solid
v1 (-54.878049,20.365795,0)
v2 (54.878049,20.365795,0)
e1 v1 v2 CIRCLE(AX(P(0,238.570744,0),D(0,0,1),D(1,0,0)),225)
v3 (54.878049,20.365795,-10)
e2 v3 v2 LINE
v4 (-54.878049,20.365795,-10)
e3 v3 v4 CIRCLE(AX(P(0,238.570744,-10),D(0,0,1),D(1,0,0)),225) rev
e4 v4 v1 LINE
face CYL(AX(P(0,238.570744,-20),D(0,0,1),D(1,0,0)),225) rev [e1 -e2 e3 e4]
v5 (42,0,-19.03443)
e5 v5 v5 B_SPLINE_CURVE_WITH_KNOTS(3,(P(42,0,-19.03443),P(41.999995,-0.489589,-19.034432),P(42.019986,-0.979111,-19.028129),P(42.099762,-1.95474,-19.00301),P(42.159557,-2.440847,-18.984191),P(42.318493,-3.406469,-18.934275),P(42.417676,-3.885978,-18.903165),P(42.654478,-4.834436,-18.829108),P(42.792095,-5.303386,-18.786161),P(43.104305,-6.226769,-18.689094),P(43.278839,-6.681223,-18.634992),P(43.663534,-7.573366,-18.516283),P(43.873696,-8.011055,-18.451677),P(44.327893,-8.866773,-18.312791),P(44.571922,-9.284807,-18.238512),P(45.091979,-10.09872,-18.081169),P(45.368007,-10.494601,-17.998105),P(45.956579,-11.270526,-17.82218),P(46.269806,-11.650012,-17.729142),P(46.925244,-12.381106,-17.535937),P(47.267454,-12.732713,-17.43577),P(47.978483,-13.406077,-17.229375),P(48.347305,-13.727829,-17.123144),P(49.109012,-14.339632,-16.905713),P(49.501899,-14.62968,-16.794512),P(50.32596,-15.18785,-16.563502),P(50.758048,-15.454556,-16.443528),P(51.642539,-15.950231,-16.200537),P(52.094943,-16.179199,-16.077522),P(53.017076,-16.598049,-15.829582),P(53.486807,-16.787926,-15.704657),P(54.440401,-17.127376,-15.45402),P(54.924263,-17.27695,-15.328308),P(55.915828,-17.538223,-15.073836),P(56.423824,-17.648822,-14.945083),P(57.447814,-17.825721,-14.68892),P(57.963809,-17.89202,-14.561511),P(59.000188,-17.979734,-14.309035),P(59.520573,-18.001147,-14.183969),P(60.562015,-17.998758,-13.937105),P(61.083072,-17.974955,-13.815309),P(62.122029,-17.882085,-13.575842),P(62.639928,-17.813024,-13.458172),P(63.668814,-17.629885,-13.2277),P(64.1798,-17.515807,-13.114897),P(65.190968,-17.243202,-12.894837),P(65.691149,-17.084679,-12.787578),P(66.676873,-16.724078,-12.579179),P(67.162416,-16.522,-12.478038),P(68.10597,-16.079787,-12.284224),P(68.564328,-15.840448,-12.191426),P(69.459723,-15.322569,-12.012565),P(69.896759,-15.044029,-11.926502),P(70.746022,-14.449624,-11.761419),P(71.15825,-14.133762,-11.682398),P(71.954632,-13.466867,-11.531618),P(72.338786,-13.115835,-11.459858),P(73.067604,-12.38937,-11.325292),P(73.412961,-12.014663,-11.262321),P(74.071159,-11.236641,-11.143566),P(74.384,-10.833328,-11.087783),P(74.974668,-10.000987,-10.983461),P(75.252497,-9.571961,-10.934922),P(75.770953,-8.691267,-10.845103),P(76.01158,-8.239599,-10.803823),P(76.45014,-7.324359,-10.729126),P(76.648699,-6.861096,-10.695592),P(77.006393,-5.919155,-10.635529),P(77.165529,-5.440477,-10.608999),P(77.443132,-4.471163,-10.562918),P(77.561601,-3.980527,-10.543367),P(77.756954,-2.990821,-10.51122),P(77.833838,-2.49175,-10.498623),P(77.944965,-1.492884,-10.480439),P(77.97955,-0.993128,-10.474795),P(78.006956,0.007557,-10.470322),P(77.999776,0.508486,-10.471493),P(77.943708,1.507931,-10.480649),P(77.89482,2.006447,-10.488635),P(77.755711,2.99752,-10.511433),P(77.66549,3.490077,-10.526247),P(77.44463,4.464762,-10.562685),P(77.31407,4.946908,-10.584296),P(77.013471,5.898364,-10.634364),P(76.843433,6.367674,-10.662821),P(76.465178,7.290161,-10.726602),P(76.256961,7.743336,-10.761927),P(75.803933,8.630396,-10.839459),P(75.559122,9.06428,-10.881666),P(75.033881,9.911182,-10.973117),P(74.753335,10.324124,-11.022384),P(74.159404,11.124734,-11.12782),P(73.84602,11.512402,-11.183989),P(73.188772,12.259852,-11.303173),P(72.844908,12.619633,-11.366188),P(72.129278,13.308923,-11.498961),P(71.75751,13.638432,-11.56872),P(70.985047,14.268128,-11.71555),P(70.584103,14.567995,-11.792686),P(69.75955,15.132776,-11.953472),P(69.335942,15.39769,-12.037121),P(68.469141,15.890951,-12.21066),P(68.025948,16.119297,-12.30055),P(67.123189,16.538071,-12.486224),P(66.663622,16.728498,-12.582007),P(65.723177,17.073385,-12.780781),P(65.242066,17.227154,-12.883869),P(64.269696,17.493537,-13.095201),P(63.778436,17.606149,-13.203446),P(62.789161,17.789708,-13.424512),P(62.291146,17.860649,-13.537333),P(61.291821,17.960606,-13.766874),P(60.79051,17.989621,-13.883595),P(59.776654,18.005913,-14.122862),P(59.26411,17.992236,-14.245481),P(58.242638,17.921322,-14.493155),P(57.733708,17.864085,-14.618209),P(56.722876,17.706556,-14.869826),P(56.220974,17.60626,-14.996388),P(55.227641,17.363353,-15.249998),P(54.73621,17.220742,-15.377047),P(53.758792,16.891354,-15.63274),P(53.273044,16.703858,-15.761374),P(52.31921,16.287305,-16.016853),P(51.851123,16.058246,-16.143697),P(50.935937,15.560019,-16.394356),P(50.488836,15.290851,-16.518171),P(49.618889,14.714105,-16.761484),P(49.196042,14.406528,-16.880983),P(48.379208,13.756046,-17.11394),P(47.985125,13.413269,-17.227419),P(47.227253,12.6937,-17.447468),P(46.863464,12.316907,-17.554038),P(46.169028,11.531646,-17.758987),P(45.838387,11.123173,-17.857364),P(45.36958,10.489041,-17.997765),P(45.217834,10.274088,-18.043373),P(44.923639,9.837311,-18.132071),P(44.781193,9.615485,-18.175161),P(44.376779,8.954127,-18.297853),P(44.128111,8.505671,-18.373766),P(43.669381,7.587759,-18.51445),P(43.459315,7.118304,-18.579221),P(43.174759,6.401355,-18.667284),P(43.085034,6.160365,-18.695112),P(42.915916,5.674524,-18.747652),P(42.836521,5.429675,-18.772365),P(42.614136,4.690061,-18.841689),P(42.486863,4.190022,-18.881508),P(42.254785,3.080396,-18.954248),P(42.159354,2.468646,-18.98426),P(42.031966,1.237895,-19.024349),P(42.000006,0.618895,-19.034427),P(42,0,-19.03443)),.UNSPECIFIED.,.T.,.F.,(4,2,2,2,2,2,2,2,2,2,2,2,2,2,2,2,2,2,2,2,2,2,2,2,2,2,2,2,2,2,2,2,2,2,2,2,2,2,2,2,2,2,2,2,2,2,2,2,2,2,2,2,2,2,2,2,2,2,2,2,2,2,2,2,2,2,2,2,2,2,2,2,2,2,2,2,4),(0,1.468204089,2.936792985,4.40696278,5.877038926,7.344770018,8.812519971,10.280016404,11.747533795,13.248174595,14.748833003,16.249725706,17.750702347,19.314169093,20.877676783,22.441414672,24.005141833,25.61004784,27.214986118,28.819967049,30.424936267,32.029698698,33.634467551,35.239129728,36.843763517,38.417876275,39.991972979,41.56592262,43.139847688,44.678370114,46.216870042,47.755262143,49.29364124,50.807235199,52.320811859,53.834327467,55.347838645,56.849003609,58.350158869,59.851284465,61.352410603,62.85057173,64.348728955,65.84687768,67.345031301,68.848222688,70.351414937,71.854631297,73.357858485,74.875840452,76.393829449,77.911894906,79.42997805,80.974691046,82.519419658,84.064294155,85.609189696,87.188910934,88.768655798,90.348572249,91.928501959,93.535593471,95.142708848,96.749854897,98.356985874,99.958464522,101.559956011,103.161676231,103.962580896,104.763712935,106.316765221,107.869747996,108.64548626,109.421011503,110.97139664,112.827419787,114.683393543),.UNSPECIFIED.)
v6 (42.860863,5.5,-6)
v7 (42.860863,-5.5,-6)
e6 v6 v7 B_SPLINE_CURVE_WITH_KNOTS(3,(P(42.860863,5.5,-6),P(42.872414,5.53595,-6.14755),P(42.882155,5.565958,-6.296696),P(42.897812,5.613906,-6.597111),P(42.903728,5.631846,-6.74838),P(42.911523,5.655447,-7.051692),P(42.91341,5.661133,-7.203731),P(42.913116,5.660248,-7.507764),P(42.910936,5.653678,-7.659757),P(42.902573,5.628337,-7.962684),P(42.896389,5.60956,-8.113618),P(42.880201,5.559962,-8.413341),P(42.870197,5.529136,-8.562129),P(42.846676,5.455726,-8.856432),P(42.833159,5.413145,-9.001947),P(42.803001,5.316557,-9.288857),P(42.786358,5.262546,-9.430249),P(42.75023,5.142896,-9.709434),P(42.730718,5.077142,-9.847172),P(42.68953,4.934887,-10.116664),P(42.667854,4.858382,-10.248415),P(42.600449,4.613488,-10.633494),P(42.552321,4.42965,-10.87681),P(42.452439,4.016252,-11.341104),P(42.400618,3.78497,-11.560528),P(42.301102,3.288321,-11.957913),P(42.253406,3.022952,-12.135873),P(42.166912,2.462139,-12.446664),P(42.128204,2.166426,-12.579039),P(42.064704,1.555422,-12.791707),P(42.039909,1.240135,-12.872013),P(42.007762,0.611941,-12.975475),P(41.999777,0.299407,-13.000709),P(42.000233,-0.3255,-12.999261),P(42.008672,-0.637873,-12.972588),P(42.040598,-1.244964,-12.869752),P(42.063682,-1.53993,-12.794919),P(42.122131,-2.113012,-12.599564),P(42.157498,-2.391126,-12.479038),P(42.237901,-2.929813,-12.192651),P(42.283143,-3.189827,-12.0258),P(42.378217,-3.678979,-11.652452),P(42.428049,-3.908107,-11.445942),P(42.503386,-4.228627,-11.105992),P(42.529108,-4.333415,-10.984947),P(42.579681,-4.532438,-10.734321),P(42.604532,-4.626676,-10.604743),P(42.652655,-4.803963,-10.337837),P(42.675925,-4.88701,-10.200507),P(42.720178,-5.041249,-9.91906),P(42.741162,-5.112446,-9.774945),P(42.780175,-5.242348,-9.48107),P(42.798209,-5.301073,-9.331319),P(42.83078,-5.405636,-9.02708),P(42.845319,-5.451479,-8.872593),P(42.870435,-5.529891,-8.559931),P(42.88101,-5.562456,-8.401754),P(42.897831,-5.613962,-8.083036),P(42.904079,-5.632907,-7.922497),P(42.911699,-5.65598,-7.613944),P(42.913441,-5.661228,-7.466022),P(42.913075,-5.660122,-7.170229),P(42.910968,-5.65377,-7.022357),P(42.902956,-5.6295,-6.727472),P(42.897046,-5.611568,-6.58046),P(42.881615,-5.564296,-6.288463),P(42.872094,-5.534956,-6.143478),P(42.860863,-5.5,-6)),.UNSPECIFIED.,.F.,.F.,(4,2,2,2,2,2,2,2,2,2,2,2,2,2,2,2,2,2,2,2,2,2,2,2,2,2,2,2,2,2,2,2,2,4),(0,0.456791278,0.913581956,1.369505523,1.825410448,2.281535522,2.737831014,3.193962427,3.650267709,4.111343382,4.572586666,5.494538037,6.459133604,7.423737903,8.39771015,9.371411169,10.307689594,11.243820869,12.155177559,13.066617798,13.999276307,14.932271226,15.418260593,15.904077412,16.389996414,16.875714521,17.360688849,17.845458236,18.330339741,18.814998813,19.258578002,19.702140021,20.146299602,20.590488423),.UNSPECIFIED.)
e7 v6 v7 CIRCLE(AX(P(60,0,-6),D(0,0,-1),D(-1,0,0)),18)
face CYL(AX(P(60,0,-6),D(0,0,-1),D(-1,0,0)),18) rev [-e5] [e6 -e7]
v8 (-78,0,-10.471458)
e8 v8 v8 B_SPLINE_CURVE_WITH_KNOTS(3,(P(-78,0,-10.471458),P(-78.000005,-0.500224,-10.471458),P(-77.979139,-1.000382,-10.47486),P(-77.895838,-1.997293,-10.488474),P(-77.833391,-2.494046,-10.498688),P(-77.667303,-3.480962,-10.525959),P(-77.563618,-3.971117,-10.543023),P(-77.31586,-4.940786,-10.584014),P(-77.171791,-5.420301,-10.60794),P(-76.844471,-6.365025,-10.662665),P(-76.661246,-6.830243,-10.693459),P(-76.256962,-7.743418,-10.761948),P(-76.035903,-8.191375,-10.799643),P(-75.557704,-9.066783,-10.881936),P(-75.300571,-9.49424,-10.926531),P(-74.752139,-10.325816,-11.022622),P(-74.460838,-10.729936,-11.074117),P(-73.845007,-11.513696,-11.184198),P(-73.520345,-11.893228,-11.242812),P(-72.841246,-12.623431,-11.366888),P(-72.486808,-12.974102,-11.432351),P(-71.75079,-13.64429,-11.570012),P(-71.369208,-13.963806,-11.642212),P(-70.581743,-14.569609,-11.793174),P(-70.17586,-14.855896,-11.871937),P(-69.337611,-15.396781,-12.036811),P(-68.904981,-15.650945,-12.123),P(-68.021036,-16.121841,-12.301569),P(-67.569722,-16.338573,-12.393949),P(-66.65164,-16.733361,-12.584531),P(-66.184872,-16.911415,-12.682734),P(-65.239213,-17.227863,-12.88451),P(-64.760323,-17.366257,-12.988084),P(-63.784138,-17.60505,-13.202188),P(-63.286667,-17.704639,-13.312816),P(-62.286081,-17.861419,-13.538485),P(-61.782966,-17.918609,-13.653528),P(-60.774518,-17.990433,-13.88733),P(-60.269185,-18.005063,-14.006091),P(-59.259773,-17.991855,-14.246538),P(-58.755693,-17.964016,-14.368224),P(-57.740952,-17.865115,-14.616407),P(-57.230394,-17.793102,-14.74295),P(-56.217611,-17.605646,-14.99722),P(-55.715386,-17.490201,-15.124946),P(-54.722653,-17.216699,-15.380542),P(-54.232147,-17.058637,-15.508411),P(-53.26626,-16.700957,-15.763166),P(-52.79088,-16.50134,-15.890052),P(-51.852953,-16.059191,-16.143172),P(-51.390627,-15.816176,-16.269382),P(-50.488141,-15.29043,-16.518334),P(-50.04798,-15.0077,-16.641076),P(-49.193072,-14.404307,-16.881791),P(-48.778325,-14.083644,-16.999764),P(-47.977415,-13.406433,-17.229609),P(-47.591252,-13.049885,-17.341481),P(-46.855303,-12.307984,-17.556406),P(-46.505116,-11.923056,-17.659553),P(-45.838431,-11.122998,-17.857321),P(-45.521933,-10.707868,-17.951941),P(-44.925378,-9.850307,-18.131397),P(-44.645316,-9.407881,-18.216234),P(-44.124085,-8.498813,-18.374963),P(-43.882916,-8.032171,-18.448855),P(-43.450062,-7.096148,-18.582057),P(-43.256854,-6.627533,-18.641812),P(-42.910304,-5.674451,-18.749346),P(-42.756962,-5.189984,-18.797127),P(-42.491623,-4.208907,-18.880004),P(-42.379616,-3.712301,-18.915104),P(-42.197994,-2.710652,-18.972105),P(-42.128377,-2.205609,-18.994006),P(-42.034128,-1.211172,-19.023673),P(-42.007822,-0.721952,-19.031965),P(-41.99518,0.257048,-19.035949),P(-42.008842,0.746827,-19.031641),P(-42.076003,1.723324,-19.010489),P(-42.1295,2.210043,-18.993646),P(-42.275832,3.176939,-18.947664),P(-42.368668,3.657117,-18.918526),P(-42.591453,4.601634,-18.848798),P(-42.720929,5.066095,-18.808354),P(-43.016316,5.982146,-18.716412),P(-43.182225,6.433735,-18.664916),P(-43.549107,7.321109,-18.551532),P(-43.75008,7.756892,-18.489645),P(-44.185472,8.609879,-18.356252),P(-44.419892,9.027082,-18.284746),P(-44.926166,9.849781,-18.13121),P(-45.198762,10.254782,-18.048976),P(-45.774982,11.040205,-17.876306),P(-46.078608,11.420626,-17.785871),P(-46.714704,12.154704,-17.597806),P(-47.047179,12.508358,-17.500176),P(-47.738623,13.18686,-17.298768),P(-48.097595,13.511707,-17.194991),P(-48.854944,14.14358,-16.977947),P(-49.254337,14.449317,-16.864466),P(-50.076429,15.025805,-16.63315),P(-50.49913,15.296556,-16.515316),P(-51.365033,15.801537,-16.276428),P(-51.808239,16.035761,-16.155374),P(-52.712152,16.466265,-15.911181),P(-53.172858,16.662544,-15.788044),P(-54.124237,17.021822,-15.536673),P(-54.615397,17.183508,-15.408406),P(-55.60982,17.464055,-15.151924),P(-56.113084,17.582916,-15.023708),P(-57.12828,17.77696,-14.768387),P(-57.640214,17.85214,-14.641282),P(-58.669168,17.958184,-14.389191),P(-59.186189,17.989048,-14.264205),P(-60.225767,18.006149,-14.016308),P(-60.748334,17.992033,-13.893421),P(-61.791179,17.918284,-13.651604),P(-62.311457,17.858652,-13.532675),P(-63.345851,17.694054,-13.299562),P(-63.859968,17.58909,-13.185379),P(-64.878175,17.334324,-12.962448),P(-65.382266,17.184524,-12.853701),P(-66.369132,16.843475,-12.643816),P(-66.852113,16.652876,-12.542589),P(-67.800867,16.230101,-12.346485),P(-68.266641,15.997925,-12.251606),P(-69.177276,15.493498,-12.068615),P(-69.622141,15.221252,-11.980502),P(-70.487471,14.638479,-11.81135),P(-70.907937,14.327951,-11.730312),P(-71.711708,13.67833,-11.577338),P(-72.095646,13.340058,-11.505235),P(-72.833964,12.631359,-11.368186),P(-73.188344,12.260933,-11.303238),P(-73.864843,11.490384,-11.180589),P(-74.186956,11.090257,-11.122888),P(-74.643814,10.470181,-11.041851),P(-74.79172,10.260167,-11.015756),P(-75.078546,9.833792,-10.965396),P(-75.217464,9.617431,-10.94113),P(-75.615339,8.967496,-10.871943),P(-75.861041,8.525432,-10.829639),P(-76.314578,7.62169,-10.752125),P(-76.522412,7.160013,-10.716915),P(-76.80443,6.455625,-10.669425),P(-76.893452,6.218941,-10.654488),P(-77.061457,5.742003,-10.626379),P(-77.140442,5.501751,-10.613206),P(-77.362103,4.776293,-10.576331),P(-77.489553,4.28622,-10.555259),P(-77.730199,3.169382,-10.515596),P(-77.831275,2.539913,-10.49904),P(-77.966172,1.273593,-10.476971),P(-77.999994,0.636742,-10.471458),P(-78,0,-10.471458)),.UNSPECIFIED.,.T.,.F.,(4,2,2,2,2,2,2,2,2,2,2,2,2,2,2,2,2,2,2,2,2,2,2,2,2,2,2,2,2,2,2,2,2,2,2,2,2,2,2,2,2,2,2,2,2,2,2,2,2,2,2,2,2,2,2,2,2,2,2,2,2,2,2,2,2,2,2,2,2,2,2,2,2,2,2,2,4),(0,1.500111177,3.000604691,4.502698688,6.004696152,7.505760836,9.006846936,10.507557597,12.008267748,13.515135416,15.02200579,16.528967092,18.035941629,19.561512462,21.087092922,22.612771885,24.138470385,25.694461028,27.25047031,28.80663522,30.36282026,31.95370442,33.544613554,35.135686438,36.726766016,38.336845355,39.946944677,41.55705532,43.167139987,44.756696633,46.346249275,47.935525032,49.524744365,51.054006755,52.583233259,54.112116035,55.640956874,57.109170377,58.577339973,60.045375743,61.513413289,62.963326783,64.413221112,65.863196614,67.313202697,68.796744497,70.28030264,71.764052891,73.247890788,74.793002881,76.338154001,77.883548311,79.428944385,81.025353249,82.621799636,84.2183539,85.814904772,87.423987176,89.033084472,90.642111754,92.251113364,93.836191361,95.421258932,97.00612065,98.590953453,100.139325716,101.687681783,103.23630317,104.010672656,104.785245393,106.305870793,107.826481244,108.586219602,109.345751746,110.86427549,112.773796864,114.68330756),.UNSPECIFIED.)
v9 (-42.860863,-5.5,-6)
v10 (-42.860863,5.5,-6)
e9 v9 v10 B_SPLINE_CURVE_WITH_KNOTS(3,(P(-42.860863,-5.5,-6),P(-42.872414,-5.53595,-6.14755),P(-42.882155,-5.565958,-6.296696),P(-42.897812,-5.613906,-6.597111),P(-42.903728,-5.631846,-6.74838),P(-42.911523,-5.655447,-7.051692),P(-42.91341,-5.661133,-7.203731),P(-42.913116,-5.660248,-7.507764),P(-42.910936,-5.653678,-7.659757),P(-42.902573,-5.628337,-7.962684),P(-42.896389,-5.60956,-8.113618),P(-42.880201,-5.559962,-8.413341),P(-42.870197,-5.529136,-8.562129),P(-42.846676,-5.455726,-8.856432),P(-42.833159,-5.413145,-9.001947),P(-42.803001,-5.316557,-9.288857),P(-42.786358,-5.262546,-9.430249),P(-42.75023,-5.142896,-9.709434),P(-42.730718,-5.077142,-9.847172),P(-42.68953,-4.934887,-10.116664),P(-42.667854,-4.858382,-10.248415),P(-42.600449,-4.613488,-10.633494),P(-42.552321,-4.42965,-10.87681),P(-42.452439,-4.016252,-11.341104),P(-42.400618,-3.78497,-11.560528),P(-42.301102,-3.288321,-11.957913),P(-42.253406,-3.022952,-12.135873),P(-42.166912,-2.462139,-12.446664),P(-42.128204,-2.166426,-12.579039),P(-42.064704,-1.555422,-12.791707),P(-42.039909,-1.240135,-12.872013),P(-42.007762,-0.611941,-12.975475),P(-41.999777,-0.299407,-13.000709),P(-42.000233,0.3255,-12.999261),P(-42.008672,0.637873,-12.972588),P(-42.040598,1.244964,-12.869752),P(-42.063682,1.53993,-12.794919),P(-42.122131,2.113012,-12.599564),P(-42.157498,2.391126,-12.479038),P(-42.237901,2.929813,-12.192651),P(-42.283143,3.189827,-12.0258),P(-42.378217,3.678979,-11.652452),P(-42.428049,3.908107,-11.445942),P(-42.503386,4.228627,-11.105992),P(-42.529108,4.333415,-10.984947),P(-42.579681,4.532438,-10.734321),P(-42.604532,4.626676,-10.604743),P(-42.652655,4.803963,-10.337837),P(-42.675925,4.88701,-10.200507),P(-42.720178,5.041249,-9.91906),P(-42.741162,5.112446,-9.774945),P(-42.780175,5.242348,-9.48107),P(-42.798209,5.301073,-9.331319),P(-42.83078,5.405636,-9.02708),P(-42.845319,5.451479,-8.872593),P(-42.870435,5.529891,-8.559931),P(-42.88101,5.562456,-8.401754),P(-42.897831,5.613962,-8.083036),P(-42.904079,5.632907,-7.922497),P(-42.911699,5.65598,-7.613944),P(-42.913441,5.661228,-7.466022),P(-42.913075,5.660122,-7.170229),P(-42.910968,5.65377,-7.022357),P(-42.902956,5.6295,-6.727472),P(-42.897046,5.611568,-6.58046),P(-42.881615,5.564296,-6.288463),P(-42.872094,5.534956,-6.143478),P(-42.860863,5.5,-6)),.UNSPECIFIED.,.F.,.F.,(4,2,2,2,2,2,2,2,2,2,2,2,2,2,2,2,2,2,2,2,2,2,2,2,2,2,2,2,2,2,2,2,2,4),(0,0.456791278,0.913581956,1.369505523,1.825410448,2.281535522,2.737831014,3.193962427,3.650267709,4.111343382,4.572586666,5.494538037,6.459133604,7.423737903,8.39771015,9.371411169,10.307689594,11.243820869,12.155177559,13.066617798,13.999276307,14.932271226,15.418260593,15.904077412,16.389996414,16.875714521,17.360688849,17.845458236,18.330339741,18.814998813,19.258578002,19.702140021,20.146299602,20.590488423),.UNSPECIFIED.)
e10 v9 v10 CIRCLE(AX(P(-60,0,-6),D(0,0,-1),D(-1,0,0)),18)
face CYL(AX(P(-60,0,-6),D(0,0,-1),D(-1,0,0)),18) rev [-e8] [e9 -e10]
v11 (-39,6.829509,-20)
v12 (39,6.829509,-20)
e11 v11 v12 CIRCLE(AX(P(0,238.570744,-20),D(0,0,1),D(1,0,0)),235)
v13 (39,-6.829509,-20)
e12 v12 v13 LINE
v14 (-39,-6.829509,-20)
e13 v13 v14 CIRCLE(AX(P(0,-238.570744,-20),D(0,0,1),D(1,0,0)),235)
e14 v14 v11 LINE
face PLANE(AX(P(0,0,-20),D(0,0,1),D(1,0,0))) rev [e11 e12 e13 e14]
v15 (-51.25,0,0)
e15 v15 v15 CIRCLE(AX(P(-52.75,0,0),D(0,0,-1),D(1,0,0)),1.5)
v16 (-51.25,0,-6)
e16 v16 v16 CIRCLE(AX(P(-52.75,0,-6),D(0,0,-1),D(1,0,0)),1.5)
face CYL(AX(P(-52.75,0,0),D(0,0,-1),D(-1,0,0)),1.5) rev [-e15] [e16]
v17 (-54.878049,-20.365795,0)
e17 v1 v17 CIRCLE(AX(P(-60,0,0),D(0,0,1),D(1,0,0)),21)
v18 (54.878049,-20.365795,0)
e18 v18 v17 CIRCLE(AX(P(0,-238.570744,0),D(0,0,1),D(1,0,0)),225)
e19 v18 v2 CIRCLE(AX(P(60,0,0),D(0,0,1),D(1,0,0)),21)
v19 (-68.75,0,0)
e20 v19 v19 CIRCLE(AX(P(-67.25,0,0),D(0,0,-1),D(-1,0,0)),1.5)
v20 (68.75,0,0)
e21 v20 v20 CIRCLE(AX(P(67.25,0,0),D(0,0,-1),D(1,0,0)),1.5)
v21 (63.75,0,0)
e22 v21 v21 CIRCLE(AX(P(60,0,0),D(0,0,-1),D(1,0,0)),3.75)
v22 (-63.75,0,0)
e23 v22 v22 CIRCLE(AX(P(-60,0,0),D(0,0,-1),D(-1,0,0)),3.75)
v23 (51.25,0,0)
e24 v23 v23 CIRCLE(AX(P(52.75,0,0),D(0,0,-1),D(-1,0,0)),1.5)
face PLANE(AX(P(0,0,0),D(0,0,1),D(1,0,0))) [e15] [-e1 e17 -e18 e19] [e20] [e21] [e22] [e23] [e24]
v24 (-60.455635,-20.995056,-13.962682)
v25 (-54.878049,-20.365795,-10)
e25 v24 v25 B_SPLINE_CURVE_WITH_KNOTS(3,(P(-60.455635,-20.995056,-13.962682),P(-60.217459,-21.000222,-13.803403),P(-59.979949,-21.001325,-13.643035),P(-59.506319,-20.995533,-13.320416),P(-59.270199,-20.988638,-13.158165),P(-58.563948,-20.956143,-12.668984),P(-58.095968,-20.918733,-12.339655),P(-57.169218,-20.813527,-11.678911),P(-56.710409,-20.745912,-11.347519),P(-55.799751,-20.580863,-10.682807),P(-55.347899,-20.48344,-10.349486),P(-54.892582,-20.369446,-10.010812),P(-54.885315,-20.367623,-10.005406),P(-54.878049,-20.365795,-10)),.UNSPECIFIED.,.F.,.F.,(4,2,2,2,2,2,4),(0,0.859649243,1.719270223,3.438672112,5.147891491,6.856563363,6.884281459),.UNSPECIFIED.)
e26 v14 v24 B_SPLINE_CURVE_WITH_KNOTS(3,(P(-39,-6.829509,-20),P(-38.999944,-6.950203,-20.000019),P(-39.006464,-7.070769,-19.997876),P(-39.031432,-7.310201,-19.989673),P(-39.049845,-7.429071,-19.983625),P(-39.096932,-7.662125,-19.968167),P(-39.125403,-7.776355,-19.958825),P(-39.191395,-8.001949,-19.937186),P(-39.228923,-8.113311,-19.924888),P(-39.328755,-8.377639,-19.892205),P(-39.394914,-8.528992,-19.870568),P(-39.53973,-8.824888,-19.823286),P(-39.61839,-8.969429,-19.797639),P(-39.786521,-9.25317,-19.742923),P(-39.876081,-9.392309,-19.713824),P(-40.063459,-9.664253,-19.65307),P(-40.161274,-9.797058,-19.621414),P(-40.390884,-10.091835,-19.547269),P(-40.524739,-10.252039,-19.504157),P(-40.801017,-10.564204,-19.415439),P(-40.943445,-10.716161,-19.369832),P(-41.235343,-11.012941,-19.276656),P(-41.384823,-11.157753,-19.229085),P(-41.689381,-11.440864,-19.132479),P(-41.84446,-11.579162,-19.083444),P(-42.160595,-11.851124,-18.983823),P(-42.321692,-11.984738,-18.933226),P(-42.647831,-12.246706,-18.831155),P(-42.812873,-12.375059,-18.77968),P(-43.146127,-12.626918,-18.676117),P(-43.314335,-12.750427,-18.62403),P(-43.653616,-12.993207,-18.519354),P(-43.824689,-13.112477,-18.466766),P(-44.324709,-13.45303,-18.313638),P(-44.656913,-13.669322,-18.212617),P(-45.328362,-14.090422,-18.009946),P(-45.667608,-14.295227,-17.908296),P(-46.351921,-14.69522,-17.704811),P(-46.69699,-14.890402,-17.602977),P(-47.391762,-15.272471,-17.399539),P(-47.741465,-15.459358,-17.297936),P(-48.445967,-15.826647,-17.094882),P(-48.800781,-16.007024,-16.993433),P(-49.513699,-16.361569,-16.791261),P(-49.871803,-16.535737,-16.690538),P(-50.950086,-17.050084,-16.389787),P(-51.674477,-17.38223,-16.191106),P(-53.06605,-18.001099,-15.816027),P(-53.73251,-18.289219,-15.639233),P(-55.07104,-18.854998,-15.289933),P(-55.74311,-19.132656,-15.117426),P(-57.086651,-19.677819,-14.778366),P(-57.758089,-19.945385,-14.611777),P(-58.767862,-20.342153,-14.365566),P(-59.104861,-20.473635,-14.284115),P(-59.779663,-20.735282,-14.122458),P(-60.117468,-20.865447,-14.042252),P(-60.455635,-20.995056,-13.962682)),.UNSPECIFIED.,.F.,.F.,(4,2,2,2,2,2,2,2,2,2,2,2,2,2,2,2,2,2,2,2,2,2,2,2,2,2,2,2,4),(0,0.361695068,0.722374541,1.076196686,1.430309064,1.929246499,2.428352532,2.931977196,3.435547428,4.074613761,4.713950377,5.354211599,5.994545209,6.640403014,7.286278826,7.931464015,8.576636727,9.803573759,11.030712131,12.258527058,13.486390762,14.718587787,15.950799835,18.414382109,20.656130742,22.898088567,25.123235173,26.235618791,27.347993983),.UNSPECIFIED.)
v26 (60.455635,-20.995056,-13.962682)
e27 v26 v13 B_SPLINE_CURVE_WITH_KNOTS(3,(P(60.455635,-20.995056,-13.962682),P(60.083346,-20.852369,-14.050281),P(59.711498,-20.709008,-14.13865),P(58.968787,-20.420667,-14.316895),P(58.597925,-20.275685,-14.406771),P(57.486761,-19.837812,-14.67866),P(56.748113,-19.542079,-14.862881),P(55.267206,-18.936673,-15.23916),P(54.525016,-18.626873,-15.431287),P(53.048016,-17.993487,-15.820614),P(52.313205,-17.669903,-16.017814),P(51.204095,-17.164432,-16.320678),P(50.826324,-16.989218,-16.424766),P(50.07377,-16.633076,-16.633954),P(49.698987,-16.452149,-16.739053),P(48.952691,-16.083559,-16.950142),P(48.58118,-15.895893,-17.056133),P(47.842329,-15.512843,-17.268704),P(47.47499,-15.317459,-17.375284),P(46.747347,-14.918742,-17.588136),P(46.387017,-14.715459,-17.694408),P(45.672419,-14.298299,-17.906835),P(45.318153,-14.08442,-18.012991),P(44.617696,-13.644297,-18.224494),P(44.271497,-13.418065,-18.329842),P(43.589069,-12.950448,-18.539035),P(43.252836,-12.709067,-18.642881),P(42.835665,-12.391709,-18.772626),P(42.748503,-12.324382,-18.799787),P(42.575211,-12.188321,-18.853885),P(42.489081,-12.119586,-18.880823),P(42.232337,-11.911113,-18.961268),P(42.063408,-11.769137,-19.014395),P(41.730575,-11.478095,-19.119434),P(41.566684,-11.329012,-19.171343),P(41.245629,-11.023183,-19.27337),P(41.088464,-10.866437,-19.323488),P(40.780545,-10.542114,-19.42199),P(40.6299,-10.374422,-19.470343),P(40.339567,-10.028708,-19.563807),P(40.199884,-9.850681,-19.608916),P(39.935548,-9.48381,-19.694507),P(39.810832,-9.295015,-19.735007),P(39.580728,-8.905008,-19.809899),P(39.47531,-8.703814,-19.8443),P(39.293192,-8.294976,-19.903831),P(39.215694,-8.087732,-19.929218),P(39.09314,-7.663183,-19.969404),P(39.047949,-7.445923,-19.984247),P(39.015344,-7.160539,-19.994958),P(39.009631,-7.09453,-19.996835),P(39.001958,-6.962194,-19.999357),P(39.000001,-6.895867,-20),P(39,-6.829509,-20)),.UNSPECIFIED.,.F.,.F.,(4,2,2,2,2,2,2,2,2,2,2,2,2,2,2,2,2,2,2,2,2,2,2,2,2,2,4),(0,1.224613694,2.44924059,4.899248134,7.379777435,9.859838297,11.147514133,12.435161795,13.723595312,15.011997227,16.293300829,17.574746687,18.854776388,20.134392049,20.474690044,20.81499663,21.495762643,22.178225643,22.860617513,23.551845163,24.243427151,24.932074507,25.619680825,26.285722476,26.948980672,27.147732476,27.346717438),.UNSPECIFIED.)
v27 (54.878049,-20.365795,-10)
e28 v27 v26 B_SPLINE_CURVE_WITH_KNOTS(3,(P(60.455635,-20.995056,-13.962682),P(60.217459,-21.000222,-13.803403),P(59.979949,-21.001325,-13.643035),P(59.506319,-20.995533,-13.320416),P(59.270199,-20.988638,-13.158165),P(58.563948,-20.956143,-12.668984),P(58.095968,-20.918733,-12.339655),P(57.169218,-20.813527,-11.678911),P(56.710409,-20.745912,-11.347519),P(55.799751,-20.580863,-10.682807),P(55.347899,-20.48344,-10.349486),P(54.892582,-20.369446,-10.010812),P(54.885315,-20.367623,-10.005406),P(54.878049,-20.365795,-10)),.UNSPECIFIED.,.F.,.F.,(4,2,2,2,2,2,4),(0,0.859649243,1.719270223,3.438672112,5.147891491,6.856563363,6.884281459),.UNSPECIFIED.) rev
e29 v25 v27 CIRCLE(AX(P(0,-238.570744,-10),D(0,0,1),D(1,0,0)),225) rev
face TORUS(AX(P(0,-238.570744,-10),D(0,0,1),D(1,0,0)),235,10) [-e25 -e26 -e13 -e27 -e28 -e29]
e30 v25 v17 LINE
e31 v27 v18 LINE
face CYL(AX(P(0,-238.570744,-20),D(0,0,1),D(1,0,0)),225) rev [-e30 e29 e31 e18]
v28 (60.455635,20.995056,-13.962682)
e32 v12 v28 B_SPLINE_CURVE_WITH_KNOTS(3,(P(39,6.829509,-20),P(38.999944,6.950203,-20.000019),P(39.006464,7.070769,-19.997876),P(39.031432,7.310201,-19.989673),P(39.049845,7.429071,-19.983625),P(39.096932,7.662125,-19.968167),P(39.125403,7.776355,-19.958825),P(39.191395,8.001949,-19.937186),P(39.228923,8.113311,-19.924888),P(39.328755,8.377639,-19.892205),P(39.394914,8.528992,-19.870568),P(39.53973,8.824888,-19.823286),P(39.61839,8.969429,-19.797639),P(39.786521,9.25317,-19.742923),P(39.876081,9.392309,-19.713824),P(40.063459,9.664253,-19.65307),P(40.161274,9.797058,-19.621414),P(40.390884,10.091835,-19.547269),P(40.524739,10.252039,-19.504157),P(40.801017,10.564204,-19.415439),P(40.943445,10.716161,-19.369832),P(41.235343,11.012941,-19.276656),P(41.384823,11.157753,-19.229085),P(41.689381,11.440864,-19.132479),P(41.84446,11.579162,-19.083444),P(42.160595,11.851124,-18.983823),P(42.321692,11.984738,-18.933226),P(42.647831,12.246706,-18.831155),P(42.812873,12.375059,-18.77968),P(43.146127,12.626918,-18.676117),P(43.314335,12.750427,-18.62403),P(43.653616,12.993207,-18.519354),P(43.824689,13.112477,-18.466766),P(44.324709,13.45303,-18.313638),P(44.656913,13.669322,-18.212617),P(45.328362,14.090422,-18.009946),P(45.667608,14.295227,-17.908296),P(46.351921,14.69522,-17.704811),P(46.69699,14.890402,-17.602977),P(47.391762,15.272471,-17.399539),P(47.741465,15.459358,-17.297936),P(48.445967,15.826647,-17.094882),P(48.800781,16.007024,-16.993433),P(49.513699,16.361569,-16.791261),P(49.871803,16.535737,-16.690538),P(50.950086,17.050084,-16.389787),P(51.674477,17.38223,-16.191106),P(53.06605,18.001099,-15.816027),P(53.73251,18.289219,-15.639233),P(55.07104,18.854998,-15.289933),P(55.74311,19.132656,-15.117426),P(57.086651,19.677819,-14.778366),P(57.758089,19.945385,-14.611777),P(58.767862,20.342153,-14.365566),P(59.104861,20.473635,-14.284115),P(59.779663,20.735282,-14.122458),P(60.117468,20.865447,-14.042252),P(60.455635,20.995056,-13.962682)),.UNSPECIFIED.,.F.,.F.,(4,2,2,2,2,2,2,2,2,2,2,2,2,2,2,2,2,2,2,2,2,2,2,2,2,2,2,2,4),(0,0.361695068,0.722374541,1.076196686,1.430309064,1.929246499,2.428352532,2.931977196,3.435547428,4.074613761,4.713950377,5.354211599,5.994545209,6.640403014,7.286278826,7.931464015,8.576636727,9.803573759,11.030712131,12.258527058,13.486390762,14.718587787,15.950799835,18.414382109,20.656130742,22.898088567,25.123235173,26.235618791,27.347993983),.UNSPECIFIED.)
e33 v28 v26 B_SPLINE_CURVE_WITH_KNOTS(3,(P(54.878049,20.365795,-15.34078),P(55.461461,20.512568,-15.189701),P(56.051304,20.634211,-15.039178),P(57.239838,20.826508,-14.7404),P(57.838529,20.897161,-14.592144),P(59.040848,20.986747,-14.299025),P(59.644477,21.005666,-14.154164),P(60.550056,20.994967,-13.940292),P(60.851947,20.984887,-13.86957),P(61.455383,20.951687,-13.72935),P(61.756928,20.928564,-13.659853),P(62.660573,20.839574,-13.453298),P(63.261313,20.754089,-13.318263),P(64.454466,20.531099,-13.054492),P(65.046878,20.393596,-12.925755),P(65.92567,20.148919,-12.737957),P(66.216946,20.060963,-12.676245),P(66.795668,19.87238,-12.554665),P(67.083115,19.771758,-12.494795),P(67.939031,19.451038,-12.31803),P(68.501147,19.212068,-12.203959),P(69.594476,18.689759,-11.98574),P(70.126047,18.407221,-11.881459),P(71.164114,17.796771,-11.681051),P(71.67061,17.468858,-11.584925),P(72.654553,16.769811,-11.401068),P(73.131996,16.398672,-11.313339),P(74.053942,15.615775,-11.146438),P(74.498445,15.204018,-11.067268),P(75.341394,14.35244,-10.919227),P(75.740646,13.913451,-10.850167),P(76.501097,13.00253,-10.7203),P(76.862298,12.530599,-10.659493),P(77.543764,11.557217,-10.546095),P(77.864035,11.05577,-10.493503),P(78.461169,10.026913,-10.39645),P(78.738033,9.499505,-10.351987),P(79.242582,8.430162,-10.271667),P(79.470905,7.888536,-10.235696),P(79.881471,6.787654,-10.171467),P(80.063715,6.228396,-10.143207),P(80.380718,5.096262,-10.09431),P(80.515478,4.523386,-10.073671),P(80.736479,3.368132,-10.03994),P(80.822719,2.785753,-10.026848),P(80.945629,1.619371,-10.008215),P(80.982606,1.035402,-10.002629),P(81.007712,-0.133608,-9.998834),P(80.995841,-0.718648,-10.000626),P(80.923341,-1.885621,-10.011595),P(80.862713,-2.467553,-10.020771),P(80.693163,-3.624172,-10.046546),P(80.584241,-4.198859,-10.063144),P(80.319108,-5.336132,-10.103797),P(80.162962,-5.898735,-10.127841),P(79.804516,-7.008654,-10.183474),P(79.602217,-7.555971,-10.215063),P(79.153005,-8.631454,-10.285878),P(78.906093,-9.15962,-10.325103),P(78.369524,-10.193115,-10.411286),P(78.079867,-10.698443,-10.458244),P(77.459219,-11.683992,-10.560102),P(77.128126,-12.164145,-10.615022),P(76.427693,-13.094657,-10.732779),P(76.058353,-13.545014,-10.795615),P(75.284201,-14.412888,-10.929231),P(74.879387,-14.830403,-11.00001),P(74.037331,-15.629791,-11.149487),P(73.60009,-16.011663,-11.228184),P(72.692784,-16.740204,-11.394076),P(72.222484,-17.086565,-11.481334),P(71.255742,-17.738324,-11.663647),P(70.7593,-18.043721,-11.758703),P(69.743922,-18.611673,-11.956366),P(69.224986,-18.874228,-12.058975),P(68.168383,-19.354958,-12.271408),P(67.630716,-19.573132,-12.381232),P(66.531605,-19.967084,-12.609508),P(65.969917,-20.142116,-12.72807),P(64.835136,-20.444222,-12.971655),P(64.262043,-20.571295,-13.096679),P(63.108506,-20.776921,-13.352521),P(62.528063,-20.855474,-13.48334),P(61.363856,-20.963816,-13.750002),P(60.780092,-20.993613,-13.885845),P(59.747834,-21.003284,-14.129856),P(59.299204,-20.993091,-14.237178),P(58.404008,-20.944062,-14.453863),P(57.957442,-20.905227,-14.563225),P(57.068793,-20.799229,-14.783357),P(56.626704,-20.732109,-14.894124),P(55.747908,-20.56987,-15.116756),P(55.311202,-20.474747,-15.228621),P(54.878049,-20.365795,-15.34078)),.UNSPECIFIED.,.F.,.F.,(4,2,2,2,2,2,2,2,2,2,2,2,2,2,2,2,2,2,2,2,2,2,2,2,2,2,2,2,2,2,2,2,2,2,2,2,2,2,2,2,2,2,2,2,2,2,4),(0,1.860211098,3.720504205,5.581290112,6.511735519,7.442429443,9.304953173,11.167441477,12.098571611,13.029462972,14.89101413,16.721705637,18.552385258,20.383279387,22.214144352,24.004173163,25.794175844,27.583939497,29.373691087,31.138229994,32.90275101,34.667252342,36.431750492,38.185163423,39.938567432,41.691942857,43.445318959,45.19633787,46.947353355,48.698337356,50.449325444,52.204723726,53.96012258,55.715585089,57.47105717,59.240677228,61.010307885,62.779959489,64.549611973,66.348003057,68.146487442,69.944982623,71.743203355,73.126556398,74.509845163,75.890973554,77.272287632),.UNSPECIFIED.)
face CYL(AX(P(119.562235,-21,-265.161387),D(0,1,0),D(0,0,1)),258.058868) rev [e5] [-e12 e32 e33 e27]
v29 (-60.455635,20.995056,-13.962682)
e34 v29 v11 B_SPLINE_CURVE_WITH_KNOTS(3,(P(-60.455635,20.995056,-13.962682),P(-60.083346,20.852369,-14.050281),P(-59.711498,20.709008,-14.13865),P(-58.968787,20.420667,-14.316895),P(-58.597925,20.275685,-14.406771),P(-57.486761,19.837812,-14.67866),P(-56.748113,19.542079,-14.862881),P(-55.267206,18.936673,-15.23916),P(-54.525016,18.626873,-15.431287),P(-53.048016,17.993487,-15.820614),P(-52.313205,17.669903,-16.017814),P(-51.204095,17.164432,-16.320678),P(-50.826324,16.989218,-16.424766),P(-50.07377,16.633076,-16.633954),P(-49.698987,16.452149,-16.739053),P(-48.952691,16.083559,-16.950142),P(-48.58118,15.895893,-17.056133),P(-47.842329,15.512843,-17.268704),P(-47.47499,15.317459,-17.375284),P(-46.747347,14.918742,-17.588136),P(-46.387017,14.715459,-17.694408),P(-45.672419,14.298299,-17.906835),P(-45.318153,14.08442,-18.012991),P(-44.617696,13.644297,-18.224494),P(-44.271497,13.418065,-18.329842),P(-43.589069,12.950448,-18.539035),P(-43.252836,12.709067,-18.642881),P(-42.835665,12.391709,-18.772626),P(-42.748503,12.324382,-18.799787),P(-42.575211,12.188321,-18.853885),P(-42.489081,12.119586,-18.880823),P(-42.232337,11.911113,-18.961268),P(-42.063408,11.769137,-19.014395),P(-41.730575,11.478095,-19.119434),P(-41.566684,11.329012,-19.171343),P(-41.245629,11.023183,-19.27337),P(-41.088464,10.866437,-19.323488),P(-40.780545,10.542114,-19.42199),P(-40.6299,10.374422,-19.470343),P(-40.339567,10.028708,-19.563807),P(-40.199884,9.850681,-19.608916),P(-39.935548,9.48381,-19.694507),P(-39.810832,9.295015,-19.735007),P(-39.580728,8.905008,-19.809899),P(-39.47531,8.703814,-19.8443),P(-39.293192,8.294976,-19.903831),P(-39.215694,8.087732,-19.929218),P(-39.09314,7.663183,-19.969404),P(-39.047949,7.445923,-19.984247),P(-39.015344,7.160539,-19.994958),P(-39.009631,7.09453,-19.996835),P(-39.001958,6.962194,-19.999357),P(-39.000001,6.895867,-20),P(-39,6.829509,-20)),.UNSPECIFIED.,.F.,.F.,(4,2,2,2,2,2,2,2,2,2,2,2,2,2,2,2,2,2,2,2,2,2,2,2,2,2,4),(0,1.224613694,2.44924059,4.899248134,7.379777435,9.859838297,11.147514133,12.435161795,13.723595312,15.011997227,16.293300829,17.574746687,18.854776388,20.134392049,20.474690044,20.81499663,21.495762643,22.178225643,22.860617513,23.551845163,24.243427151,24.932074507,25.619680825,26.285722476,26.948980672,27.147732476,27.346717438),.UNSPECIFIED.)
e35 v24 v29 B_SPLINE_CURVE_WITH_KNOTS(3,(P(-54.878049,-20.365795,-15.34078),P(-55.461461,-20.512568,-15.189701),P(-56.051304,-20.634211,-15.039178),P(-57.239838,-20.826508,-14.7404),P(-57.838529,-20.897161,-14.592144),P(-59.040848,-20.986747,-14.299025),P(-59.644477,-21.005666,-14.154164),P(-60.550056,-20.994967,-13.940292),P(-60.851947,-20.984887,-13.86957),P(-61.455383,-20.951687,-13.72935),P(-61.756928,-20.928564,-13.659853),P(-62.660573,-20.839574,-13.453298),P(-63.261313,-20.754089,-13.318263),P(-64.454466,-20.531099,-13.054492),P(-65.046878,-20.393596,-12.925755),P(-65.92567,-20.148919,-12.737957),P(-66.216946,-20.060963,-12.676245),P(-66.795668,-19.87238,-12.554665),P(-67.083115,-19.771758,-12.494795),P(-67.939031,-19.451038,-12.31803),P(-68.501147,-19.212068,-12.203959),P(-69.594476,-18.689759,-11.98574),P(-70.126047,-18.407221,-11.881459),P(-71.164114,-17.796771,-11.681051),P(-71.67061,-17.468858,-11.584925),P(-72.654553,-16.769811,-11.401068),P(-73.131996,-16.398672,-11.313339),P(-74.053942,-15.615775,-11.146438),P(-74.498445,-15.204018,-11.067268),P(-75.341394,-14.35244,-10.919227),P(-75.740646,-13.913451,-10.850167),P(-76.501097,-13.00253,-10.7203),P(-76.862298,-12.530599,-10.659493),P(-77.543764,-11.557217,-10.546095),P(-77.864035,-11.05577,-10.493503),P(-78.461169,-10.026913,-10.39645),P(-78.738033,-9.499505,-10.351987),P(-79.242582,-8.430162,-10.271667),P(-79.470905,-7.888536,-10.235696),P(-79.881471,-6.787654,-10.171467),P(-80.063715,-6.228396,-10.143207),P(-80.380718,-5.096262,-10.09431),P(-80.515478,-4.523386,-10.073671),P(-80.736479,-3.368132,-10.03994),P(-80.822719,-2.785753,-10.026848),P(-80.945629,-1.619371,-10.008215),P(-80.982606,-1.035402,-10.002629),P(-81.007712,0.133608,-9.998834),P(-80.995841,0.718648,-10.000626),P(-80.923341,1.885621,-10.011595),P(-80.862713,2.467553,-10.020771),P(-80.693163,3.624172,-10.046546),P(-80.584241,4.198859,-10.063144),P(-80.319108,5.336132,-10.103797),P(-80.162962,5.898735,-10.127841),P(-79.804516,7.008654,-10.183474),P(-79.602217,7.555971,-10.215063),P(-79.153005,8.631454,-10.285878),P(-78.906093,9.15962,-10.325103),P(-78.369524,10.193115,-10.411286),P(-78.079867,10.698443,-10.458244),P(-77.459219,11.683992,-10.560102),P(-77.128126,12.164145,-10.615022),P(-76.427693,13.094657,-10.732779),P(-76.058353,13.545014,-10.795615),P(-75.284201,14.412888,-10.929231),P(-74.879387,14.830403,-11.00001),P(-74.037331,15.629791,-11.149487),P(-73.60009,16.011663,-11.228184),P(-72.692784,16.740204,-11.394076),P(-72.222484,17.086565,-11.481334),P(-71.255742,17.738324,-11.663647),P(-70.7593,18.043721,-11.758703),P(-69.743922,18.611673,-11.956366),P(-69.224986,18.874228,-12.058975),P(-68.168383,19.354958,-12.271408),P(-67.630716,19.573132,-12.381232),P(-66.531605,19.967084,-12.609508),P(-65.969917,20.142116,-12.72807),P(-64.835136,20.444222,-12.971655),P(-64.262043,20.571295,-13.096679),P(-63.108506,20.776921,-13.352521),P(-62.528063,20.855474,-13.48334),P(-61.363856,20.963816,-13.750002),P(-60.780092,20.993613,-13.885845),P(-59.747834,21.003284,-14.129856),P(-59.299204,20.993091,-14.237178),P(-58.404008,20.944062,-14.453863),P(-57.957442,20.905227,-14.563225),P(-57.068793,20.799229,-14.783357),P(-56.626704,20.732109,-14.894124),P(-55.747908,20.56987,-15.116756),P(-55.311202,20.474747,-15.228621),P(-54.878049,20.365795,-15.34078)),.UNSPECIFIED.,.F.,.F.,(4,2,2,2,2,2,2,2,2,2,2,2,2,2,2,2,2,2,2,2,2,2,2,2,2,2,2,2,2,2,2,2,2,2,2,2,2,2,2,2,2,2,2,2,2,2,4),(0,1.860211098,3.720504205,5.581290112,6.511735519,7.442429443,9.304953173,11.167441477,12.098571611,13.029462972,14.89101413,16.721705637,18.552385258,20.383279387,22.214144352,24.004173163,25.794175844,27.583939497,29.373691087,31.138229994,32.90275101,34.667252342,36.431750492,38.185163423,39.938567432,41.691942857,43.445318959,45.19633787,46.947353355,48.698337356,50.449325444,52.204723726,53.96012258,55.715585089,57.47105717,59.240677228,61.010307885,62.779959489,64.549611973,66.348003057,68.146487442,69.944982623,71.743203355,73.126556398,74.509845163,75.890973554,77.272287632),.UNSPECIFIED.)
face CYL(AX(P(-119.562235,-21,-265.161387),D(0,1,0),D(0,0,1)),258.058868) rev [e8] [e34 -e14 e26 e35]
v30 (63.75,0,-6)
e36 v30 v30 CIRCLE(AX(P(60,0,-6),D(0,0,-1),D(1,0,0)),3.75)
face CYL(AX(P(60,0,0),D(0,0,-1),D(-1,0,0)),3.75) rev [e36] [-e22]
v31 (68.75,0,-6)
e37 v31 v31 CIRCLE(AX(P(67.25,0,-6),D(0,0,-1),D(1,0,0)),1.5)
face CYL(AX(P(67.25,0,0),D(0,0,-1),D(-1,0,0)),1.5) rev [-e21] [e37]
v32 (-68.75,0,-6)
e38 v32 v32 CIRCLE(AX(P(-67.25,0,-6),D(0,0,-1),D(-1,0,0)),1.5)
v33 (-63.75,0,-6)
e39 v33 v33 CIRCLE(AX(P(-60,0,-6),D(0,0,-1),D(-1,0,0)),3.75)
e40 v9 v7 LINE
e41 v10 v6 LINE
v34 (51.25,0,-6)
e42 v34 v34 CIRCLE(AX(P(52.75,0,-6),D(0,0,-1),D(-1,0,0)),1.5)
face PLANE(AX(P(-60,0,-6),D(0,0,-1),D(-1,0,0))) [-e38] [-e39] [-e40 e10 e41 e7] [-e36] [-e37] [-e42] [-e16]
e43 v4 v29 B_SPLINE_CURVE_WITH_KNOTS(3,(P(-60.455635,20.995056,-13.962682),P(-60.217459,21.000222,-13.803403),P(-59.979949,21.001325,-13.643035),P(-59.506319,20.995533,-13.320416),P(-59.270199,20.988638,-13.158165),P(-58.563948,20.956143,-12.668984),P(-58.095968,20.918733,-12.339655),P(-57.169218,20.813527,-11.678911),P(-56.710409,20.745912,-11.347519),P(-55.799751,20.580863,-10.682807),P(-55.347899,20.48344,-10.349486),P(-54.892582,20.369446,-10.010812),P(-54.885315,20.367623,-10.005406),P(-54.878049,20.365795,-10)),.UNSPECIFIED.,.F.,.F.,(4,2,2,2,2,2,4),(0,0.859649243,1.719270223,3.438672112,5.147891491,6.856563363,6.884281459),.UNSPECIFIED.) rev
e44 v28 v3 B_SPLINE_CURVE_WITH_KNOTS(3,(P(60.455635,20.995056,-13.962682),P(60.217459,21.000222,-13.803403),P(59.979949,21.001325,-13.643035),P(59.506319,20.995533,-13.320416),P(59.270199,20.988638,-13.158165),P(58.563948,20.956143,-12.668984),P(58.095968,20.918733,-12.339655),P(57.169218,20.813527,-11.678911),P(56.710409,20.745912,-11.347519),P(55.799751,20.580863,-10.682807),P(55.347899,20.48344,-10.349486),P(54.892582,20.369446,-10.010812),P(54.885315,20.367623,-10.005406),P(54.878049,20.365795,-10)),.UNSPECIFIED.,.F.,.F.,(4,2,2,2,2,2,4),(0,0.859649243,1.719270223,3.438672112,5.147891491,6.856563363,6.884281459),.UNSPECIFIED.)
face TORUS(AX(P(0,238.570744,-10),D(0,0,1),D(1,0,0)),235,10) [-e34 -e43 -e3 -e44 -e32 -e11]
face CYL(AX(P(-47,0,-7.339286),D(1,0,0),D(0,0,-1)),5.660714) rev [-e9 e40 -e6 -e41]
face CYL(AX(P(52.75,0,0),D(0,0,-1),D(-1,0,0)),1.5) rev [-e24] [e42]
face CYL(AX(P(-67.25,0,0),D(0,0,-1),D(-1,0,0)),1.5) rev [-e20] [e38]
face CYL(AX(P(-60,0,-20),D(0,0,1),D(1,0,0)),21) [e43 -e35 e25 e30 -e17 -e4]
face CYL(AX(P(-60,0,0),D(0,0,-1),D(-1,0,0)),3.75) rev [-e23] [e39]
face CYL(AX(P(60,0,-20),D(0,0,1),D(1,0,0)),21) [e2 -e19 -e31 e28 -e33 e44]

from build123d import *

# Parameters (mm, degrees)
SALIENTE_EXTRUIR1_DEPTH    = 20
CORTAR_EXTRUIR1_DEPTH      = 87.034876649
CORTAR_EXTRUIR1_DEPTH_BACK = 87.034876649
CROQUIS4_R                 = 18
CORTAR_EXTRUIR2_DEPTH      = 14
CROQUIS5_R                 = 3.75
CROQUIS5_R_2               = 1.5
CORTAR_EXTRUIR3_DEPTH      = 85.841027952
REDONDEO1_R                = 10
CORTAR_EXTRUIR4_DEPTH      = 47


with BuildPart() as part:
    # Croquis1 → Saliente-Extruir1 (new body)
    with BuildSketch(Plane.XY):
        with BuildLine():
            ThreePointArc((54.87804878, 20.365795239), (0, 13.570744225), (-54.87804878, 20.365795239))
            ThreePointArc((-54.87804878, 20.365795239), (-81, 0), (-54.87804878, -20.365795239))
            ThreePointArc((-54.87804878, -20.365795239), (0, -13.570744225), (54.87804878, -20.365795239))
            ThreePointArc((54.87804878, -20.365795239), (81, 0), (54.87804878, 20.365795239))
        make_face()
    extrude(amount=-SALIENTE_EXTRUIR1_DEPTH)

    # Croquis2 → Cortar-Extruir1 (cut, two sides: drawn at the far end of the back side and taken through both)
    with BuildSketch(Plane(origin=(0, 0, 0), x_dir=(1, 0, 0), z_dir=(0, 1, 0)).offset(-CORTAR_EXTRUIR1_DEPTH_BACK)):
        with BuildLine():
            Line((-81, 10), (-81, 20))
            Line((-81, 20), (-39, 20))
            ThreePointArc((-39, 20), (-59.790503904, 14.120116398), (-81, 10))
        make_face()
        with BuildLine():
            Line((81, 10), (81, 20))
            Line((81, 20), (39, 20))
            ThreePointArc((39, 20), (59.790503904, 14.120116398), (81, 10))
        make_face()
    extrude(amount=CORTAR_EXTRUIR1_DEPTH + CORTAR_EXTRUIR1_DEPTH_BACK, mode=Mode.SUBTRACT)

    # Croquis4 → Cortar-Extruir2 (cut)
    with BuildSketch(Plane(origin=(0, 0, -20), x_dir=(-1, 0, 0), z_dir=(0, 0, -1))):
        with Locations((60, 0)):
            Circle(CROQUIS4_R)
        with Locations((-60, 0)):
            Circle(CROQUIS4_R)
    extrude(amount=-CORTAR_EXTRUIR2_DEPTH, mode=Mode.SUBTRACT)

    # Croquis5 → Cortar-Extruir3 (cut, through all)
    with BuildSketch(Plane(origin=(0, 0, -6), x_dir=(-1, 0, 0), z_dir=(0, 0, -1))):
        with Locations((60, 0)):
            Circle(CROQUIS5_R)
        with Locations((67.25, 0)):
            Circle(CROQUIS5_R_2)
        with Locations(Location((52.75, 0, 0), (0, 0, 180))):
            Circle(CROQUIS5_R_2)
        with Locations(Location((-67.25, 0, 0), (0, 0, 180))):
            Circle(CROQUIS5_R_2)
        with Locations(Location((-60, 0, 0), (0, 0, 180))):
            Circle(CROQUIS5_R)
        with Locations((-52.75, 0)):
            Circle(CROQUIS5_R_2)
    extrude(amount=-CORTAR_EXTRUIR3_DEPTH, mode=Mode.SUBTRACT)

    # Redondeo1
    # the kernel refuses this fillet: 10 mm, written as the material it takes off along each edge
    with BuildSketch(Plane(origin=(0, -238.570744225, -20), x_dir=(-0.28147080374244887, 0.9595697924802447, 0), z_dir=(-0.9595697924802447, -0.28147080374244887, 0))) as redondeo1_piece_1:
        with BuildLine():
            CenterArc((225 + REDONDEO1_R, -REDONDEO1_R), REDONDEO1_R, 90, 90)
            Line((225, -REDONDEO1_R), (225, 0))
            Line((225, 0), (225 + REDONDEO1_R, 0))
        make_face()
    revolve(axis=Axis((0, -238.570744225, -20), (0, 0, -1)), revolution_arc=32.696012994, mode=Mode.SUBTRACT)
    with BuildSketch(Plane(origin=(0, 238.570744225, -20), x_dir=(0.28147080374244876, -0.9595697924802447, 0), z_dir=(0.9595697924802447, 0.28147080374244876, 0))) as redondeo1_piece_2:
        with BuildLine():
            CenterArc((225 + REDONDEO1_R, -REDONDEO1_R), REDONDEO1_R, 90, 90)
            Line((225 + REDONDEO1_R, 0), (225, 0))
            Line((225, 0), (225, -REDONDEO1_R))
        make_face()
    revolve(axis=Axis((0, 238.570744225, -20), (0, 0, -1)), revolution_arc=32.696012994, mode=Mode.SUBTRACT)

    # Croquis6 → Cortar-Extruir4 (cut, symmetric)
    with BuildSketch(Plane(origin=(0, 0, 0), x_dir=(0, 0, -1), z_dir=(1, 0, 0))):
        with BuildLine():
            Line((6, 5.5), (6, -5.5))
            ThreePointArc((6, -5.5), (13, 0), (6, 5.5))
        make_face()
    extrude(amount=CORTAR_EXTRUIR4_DEPTH, both=True, mode=Mode.SUBTRACT)


solid = part.part
